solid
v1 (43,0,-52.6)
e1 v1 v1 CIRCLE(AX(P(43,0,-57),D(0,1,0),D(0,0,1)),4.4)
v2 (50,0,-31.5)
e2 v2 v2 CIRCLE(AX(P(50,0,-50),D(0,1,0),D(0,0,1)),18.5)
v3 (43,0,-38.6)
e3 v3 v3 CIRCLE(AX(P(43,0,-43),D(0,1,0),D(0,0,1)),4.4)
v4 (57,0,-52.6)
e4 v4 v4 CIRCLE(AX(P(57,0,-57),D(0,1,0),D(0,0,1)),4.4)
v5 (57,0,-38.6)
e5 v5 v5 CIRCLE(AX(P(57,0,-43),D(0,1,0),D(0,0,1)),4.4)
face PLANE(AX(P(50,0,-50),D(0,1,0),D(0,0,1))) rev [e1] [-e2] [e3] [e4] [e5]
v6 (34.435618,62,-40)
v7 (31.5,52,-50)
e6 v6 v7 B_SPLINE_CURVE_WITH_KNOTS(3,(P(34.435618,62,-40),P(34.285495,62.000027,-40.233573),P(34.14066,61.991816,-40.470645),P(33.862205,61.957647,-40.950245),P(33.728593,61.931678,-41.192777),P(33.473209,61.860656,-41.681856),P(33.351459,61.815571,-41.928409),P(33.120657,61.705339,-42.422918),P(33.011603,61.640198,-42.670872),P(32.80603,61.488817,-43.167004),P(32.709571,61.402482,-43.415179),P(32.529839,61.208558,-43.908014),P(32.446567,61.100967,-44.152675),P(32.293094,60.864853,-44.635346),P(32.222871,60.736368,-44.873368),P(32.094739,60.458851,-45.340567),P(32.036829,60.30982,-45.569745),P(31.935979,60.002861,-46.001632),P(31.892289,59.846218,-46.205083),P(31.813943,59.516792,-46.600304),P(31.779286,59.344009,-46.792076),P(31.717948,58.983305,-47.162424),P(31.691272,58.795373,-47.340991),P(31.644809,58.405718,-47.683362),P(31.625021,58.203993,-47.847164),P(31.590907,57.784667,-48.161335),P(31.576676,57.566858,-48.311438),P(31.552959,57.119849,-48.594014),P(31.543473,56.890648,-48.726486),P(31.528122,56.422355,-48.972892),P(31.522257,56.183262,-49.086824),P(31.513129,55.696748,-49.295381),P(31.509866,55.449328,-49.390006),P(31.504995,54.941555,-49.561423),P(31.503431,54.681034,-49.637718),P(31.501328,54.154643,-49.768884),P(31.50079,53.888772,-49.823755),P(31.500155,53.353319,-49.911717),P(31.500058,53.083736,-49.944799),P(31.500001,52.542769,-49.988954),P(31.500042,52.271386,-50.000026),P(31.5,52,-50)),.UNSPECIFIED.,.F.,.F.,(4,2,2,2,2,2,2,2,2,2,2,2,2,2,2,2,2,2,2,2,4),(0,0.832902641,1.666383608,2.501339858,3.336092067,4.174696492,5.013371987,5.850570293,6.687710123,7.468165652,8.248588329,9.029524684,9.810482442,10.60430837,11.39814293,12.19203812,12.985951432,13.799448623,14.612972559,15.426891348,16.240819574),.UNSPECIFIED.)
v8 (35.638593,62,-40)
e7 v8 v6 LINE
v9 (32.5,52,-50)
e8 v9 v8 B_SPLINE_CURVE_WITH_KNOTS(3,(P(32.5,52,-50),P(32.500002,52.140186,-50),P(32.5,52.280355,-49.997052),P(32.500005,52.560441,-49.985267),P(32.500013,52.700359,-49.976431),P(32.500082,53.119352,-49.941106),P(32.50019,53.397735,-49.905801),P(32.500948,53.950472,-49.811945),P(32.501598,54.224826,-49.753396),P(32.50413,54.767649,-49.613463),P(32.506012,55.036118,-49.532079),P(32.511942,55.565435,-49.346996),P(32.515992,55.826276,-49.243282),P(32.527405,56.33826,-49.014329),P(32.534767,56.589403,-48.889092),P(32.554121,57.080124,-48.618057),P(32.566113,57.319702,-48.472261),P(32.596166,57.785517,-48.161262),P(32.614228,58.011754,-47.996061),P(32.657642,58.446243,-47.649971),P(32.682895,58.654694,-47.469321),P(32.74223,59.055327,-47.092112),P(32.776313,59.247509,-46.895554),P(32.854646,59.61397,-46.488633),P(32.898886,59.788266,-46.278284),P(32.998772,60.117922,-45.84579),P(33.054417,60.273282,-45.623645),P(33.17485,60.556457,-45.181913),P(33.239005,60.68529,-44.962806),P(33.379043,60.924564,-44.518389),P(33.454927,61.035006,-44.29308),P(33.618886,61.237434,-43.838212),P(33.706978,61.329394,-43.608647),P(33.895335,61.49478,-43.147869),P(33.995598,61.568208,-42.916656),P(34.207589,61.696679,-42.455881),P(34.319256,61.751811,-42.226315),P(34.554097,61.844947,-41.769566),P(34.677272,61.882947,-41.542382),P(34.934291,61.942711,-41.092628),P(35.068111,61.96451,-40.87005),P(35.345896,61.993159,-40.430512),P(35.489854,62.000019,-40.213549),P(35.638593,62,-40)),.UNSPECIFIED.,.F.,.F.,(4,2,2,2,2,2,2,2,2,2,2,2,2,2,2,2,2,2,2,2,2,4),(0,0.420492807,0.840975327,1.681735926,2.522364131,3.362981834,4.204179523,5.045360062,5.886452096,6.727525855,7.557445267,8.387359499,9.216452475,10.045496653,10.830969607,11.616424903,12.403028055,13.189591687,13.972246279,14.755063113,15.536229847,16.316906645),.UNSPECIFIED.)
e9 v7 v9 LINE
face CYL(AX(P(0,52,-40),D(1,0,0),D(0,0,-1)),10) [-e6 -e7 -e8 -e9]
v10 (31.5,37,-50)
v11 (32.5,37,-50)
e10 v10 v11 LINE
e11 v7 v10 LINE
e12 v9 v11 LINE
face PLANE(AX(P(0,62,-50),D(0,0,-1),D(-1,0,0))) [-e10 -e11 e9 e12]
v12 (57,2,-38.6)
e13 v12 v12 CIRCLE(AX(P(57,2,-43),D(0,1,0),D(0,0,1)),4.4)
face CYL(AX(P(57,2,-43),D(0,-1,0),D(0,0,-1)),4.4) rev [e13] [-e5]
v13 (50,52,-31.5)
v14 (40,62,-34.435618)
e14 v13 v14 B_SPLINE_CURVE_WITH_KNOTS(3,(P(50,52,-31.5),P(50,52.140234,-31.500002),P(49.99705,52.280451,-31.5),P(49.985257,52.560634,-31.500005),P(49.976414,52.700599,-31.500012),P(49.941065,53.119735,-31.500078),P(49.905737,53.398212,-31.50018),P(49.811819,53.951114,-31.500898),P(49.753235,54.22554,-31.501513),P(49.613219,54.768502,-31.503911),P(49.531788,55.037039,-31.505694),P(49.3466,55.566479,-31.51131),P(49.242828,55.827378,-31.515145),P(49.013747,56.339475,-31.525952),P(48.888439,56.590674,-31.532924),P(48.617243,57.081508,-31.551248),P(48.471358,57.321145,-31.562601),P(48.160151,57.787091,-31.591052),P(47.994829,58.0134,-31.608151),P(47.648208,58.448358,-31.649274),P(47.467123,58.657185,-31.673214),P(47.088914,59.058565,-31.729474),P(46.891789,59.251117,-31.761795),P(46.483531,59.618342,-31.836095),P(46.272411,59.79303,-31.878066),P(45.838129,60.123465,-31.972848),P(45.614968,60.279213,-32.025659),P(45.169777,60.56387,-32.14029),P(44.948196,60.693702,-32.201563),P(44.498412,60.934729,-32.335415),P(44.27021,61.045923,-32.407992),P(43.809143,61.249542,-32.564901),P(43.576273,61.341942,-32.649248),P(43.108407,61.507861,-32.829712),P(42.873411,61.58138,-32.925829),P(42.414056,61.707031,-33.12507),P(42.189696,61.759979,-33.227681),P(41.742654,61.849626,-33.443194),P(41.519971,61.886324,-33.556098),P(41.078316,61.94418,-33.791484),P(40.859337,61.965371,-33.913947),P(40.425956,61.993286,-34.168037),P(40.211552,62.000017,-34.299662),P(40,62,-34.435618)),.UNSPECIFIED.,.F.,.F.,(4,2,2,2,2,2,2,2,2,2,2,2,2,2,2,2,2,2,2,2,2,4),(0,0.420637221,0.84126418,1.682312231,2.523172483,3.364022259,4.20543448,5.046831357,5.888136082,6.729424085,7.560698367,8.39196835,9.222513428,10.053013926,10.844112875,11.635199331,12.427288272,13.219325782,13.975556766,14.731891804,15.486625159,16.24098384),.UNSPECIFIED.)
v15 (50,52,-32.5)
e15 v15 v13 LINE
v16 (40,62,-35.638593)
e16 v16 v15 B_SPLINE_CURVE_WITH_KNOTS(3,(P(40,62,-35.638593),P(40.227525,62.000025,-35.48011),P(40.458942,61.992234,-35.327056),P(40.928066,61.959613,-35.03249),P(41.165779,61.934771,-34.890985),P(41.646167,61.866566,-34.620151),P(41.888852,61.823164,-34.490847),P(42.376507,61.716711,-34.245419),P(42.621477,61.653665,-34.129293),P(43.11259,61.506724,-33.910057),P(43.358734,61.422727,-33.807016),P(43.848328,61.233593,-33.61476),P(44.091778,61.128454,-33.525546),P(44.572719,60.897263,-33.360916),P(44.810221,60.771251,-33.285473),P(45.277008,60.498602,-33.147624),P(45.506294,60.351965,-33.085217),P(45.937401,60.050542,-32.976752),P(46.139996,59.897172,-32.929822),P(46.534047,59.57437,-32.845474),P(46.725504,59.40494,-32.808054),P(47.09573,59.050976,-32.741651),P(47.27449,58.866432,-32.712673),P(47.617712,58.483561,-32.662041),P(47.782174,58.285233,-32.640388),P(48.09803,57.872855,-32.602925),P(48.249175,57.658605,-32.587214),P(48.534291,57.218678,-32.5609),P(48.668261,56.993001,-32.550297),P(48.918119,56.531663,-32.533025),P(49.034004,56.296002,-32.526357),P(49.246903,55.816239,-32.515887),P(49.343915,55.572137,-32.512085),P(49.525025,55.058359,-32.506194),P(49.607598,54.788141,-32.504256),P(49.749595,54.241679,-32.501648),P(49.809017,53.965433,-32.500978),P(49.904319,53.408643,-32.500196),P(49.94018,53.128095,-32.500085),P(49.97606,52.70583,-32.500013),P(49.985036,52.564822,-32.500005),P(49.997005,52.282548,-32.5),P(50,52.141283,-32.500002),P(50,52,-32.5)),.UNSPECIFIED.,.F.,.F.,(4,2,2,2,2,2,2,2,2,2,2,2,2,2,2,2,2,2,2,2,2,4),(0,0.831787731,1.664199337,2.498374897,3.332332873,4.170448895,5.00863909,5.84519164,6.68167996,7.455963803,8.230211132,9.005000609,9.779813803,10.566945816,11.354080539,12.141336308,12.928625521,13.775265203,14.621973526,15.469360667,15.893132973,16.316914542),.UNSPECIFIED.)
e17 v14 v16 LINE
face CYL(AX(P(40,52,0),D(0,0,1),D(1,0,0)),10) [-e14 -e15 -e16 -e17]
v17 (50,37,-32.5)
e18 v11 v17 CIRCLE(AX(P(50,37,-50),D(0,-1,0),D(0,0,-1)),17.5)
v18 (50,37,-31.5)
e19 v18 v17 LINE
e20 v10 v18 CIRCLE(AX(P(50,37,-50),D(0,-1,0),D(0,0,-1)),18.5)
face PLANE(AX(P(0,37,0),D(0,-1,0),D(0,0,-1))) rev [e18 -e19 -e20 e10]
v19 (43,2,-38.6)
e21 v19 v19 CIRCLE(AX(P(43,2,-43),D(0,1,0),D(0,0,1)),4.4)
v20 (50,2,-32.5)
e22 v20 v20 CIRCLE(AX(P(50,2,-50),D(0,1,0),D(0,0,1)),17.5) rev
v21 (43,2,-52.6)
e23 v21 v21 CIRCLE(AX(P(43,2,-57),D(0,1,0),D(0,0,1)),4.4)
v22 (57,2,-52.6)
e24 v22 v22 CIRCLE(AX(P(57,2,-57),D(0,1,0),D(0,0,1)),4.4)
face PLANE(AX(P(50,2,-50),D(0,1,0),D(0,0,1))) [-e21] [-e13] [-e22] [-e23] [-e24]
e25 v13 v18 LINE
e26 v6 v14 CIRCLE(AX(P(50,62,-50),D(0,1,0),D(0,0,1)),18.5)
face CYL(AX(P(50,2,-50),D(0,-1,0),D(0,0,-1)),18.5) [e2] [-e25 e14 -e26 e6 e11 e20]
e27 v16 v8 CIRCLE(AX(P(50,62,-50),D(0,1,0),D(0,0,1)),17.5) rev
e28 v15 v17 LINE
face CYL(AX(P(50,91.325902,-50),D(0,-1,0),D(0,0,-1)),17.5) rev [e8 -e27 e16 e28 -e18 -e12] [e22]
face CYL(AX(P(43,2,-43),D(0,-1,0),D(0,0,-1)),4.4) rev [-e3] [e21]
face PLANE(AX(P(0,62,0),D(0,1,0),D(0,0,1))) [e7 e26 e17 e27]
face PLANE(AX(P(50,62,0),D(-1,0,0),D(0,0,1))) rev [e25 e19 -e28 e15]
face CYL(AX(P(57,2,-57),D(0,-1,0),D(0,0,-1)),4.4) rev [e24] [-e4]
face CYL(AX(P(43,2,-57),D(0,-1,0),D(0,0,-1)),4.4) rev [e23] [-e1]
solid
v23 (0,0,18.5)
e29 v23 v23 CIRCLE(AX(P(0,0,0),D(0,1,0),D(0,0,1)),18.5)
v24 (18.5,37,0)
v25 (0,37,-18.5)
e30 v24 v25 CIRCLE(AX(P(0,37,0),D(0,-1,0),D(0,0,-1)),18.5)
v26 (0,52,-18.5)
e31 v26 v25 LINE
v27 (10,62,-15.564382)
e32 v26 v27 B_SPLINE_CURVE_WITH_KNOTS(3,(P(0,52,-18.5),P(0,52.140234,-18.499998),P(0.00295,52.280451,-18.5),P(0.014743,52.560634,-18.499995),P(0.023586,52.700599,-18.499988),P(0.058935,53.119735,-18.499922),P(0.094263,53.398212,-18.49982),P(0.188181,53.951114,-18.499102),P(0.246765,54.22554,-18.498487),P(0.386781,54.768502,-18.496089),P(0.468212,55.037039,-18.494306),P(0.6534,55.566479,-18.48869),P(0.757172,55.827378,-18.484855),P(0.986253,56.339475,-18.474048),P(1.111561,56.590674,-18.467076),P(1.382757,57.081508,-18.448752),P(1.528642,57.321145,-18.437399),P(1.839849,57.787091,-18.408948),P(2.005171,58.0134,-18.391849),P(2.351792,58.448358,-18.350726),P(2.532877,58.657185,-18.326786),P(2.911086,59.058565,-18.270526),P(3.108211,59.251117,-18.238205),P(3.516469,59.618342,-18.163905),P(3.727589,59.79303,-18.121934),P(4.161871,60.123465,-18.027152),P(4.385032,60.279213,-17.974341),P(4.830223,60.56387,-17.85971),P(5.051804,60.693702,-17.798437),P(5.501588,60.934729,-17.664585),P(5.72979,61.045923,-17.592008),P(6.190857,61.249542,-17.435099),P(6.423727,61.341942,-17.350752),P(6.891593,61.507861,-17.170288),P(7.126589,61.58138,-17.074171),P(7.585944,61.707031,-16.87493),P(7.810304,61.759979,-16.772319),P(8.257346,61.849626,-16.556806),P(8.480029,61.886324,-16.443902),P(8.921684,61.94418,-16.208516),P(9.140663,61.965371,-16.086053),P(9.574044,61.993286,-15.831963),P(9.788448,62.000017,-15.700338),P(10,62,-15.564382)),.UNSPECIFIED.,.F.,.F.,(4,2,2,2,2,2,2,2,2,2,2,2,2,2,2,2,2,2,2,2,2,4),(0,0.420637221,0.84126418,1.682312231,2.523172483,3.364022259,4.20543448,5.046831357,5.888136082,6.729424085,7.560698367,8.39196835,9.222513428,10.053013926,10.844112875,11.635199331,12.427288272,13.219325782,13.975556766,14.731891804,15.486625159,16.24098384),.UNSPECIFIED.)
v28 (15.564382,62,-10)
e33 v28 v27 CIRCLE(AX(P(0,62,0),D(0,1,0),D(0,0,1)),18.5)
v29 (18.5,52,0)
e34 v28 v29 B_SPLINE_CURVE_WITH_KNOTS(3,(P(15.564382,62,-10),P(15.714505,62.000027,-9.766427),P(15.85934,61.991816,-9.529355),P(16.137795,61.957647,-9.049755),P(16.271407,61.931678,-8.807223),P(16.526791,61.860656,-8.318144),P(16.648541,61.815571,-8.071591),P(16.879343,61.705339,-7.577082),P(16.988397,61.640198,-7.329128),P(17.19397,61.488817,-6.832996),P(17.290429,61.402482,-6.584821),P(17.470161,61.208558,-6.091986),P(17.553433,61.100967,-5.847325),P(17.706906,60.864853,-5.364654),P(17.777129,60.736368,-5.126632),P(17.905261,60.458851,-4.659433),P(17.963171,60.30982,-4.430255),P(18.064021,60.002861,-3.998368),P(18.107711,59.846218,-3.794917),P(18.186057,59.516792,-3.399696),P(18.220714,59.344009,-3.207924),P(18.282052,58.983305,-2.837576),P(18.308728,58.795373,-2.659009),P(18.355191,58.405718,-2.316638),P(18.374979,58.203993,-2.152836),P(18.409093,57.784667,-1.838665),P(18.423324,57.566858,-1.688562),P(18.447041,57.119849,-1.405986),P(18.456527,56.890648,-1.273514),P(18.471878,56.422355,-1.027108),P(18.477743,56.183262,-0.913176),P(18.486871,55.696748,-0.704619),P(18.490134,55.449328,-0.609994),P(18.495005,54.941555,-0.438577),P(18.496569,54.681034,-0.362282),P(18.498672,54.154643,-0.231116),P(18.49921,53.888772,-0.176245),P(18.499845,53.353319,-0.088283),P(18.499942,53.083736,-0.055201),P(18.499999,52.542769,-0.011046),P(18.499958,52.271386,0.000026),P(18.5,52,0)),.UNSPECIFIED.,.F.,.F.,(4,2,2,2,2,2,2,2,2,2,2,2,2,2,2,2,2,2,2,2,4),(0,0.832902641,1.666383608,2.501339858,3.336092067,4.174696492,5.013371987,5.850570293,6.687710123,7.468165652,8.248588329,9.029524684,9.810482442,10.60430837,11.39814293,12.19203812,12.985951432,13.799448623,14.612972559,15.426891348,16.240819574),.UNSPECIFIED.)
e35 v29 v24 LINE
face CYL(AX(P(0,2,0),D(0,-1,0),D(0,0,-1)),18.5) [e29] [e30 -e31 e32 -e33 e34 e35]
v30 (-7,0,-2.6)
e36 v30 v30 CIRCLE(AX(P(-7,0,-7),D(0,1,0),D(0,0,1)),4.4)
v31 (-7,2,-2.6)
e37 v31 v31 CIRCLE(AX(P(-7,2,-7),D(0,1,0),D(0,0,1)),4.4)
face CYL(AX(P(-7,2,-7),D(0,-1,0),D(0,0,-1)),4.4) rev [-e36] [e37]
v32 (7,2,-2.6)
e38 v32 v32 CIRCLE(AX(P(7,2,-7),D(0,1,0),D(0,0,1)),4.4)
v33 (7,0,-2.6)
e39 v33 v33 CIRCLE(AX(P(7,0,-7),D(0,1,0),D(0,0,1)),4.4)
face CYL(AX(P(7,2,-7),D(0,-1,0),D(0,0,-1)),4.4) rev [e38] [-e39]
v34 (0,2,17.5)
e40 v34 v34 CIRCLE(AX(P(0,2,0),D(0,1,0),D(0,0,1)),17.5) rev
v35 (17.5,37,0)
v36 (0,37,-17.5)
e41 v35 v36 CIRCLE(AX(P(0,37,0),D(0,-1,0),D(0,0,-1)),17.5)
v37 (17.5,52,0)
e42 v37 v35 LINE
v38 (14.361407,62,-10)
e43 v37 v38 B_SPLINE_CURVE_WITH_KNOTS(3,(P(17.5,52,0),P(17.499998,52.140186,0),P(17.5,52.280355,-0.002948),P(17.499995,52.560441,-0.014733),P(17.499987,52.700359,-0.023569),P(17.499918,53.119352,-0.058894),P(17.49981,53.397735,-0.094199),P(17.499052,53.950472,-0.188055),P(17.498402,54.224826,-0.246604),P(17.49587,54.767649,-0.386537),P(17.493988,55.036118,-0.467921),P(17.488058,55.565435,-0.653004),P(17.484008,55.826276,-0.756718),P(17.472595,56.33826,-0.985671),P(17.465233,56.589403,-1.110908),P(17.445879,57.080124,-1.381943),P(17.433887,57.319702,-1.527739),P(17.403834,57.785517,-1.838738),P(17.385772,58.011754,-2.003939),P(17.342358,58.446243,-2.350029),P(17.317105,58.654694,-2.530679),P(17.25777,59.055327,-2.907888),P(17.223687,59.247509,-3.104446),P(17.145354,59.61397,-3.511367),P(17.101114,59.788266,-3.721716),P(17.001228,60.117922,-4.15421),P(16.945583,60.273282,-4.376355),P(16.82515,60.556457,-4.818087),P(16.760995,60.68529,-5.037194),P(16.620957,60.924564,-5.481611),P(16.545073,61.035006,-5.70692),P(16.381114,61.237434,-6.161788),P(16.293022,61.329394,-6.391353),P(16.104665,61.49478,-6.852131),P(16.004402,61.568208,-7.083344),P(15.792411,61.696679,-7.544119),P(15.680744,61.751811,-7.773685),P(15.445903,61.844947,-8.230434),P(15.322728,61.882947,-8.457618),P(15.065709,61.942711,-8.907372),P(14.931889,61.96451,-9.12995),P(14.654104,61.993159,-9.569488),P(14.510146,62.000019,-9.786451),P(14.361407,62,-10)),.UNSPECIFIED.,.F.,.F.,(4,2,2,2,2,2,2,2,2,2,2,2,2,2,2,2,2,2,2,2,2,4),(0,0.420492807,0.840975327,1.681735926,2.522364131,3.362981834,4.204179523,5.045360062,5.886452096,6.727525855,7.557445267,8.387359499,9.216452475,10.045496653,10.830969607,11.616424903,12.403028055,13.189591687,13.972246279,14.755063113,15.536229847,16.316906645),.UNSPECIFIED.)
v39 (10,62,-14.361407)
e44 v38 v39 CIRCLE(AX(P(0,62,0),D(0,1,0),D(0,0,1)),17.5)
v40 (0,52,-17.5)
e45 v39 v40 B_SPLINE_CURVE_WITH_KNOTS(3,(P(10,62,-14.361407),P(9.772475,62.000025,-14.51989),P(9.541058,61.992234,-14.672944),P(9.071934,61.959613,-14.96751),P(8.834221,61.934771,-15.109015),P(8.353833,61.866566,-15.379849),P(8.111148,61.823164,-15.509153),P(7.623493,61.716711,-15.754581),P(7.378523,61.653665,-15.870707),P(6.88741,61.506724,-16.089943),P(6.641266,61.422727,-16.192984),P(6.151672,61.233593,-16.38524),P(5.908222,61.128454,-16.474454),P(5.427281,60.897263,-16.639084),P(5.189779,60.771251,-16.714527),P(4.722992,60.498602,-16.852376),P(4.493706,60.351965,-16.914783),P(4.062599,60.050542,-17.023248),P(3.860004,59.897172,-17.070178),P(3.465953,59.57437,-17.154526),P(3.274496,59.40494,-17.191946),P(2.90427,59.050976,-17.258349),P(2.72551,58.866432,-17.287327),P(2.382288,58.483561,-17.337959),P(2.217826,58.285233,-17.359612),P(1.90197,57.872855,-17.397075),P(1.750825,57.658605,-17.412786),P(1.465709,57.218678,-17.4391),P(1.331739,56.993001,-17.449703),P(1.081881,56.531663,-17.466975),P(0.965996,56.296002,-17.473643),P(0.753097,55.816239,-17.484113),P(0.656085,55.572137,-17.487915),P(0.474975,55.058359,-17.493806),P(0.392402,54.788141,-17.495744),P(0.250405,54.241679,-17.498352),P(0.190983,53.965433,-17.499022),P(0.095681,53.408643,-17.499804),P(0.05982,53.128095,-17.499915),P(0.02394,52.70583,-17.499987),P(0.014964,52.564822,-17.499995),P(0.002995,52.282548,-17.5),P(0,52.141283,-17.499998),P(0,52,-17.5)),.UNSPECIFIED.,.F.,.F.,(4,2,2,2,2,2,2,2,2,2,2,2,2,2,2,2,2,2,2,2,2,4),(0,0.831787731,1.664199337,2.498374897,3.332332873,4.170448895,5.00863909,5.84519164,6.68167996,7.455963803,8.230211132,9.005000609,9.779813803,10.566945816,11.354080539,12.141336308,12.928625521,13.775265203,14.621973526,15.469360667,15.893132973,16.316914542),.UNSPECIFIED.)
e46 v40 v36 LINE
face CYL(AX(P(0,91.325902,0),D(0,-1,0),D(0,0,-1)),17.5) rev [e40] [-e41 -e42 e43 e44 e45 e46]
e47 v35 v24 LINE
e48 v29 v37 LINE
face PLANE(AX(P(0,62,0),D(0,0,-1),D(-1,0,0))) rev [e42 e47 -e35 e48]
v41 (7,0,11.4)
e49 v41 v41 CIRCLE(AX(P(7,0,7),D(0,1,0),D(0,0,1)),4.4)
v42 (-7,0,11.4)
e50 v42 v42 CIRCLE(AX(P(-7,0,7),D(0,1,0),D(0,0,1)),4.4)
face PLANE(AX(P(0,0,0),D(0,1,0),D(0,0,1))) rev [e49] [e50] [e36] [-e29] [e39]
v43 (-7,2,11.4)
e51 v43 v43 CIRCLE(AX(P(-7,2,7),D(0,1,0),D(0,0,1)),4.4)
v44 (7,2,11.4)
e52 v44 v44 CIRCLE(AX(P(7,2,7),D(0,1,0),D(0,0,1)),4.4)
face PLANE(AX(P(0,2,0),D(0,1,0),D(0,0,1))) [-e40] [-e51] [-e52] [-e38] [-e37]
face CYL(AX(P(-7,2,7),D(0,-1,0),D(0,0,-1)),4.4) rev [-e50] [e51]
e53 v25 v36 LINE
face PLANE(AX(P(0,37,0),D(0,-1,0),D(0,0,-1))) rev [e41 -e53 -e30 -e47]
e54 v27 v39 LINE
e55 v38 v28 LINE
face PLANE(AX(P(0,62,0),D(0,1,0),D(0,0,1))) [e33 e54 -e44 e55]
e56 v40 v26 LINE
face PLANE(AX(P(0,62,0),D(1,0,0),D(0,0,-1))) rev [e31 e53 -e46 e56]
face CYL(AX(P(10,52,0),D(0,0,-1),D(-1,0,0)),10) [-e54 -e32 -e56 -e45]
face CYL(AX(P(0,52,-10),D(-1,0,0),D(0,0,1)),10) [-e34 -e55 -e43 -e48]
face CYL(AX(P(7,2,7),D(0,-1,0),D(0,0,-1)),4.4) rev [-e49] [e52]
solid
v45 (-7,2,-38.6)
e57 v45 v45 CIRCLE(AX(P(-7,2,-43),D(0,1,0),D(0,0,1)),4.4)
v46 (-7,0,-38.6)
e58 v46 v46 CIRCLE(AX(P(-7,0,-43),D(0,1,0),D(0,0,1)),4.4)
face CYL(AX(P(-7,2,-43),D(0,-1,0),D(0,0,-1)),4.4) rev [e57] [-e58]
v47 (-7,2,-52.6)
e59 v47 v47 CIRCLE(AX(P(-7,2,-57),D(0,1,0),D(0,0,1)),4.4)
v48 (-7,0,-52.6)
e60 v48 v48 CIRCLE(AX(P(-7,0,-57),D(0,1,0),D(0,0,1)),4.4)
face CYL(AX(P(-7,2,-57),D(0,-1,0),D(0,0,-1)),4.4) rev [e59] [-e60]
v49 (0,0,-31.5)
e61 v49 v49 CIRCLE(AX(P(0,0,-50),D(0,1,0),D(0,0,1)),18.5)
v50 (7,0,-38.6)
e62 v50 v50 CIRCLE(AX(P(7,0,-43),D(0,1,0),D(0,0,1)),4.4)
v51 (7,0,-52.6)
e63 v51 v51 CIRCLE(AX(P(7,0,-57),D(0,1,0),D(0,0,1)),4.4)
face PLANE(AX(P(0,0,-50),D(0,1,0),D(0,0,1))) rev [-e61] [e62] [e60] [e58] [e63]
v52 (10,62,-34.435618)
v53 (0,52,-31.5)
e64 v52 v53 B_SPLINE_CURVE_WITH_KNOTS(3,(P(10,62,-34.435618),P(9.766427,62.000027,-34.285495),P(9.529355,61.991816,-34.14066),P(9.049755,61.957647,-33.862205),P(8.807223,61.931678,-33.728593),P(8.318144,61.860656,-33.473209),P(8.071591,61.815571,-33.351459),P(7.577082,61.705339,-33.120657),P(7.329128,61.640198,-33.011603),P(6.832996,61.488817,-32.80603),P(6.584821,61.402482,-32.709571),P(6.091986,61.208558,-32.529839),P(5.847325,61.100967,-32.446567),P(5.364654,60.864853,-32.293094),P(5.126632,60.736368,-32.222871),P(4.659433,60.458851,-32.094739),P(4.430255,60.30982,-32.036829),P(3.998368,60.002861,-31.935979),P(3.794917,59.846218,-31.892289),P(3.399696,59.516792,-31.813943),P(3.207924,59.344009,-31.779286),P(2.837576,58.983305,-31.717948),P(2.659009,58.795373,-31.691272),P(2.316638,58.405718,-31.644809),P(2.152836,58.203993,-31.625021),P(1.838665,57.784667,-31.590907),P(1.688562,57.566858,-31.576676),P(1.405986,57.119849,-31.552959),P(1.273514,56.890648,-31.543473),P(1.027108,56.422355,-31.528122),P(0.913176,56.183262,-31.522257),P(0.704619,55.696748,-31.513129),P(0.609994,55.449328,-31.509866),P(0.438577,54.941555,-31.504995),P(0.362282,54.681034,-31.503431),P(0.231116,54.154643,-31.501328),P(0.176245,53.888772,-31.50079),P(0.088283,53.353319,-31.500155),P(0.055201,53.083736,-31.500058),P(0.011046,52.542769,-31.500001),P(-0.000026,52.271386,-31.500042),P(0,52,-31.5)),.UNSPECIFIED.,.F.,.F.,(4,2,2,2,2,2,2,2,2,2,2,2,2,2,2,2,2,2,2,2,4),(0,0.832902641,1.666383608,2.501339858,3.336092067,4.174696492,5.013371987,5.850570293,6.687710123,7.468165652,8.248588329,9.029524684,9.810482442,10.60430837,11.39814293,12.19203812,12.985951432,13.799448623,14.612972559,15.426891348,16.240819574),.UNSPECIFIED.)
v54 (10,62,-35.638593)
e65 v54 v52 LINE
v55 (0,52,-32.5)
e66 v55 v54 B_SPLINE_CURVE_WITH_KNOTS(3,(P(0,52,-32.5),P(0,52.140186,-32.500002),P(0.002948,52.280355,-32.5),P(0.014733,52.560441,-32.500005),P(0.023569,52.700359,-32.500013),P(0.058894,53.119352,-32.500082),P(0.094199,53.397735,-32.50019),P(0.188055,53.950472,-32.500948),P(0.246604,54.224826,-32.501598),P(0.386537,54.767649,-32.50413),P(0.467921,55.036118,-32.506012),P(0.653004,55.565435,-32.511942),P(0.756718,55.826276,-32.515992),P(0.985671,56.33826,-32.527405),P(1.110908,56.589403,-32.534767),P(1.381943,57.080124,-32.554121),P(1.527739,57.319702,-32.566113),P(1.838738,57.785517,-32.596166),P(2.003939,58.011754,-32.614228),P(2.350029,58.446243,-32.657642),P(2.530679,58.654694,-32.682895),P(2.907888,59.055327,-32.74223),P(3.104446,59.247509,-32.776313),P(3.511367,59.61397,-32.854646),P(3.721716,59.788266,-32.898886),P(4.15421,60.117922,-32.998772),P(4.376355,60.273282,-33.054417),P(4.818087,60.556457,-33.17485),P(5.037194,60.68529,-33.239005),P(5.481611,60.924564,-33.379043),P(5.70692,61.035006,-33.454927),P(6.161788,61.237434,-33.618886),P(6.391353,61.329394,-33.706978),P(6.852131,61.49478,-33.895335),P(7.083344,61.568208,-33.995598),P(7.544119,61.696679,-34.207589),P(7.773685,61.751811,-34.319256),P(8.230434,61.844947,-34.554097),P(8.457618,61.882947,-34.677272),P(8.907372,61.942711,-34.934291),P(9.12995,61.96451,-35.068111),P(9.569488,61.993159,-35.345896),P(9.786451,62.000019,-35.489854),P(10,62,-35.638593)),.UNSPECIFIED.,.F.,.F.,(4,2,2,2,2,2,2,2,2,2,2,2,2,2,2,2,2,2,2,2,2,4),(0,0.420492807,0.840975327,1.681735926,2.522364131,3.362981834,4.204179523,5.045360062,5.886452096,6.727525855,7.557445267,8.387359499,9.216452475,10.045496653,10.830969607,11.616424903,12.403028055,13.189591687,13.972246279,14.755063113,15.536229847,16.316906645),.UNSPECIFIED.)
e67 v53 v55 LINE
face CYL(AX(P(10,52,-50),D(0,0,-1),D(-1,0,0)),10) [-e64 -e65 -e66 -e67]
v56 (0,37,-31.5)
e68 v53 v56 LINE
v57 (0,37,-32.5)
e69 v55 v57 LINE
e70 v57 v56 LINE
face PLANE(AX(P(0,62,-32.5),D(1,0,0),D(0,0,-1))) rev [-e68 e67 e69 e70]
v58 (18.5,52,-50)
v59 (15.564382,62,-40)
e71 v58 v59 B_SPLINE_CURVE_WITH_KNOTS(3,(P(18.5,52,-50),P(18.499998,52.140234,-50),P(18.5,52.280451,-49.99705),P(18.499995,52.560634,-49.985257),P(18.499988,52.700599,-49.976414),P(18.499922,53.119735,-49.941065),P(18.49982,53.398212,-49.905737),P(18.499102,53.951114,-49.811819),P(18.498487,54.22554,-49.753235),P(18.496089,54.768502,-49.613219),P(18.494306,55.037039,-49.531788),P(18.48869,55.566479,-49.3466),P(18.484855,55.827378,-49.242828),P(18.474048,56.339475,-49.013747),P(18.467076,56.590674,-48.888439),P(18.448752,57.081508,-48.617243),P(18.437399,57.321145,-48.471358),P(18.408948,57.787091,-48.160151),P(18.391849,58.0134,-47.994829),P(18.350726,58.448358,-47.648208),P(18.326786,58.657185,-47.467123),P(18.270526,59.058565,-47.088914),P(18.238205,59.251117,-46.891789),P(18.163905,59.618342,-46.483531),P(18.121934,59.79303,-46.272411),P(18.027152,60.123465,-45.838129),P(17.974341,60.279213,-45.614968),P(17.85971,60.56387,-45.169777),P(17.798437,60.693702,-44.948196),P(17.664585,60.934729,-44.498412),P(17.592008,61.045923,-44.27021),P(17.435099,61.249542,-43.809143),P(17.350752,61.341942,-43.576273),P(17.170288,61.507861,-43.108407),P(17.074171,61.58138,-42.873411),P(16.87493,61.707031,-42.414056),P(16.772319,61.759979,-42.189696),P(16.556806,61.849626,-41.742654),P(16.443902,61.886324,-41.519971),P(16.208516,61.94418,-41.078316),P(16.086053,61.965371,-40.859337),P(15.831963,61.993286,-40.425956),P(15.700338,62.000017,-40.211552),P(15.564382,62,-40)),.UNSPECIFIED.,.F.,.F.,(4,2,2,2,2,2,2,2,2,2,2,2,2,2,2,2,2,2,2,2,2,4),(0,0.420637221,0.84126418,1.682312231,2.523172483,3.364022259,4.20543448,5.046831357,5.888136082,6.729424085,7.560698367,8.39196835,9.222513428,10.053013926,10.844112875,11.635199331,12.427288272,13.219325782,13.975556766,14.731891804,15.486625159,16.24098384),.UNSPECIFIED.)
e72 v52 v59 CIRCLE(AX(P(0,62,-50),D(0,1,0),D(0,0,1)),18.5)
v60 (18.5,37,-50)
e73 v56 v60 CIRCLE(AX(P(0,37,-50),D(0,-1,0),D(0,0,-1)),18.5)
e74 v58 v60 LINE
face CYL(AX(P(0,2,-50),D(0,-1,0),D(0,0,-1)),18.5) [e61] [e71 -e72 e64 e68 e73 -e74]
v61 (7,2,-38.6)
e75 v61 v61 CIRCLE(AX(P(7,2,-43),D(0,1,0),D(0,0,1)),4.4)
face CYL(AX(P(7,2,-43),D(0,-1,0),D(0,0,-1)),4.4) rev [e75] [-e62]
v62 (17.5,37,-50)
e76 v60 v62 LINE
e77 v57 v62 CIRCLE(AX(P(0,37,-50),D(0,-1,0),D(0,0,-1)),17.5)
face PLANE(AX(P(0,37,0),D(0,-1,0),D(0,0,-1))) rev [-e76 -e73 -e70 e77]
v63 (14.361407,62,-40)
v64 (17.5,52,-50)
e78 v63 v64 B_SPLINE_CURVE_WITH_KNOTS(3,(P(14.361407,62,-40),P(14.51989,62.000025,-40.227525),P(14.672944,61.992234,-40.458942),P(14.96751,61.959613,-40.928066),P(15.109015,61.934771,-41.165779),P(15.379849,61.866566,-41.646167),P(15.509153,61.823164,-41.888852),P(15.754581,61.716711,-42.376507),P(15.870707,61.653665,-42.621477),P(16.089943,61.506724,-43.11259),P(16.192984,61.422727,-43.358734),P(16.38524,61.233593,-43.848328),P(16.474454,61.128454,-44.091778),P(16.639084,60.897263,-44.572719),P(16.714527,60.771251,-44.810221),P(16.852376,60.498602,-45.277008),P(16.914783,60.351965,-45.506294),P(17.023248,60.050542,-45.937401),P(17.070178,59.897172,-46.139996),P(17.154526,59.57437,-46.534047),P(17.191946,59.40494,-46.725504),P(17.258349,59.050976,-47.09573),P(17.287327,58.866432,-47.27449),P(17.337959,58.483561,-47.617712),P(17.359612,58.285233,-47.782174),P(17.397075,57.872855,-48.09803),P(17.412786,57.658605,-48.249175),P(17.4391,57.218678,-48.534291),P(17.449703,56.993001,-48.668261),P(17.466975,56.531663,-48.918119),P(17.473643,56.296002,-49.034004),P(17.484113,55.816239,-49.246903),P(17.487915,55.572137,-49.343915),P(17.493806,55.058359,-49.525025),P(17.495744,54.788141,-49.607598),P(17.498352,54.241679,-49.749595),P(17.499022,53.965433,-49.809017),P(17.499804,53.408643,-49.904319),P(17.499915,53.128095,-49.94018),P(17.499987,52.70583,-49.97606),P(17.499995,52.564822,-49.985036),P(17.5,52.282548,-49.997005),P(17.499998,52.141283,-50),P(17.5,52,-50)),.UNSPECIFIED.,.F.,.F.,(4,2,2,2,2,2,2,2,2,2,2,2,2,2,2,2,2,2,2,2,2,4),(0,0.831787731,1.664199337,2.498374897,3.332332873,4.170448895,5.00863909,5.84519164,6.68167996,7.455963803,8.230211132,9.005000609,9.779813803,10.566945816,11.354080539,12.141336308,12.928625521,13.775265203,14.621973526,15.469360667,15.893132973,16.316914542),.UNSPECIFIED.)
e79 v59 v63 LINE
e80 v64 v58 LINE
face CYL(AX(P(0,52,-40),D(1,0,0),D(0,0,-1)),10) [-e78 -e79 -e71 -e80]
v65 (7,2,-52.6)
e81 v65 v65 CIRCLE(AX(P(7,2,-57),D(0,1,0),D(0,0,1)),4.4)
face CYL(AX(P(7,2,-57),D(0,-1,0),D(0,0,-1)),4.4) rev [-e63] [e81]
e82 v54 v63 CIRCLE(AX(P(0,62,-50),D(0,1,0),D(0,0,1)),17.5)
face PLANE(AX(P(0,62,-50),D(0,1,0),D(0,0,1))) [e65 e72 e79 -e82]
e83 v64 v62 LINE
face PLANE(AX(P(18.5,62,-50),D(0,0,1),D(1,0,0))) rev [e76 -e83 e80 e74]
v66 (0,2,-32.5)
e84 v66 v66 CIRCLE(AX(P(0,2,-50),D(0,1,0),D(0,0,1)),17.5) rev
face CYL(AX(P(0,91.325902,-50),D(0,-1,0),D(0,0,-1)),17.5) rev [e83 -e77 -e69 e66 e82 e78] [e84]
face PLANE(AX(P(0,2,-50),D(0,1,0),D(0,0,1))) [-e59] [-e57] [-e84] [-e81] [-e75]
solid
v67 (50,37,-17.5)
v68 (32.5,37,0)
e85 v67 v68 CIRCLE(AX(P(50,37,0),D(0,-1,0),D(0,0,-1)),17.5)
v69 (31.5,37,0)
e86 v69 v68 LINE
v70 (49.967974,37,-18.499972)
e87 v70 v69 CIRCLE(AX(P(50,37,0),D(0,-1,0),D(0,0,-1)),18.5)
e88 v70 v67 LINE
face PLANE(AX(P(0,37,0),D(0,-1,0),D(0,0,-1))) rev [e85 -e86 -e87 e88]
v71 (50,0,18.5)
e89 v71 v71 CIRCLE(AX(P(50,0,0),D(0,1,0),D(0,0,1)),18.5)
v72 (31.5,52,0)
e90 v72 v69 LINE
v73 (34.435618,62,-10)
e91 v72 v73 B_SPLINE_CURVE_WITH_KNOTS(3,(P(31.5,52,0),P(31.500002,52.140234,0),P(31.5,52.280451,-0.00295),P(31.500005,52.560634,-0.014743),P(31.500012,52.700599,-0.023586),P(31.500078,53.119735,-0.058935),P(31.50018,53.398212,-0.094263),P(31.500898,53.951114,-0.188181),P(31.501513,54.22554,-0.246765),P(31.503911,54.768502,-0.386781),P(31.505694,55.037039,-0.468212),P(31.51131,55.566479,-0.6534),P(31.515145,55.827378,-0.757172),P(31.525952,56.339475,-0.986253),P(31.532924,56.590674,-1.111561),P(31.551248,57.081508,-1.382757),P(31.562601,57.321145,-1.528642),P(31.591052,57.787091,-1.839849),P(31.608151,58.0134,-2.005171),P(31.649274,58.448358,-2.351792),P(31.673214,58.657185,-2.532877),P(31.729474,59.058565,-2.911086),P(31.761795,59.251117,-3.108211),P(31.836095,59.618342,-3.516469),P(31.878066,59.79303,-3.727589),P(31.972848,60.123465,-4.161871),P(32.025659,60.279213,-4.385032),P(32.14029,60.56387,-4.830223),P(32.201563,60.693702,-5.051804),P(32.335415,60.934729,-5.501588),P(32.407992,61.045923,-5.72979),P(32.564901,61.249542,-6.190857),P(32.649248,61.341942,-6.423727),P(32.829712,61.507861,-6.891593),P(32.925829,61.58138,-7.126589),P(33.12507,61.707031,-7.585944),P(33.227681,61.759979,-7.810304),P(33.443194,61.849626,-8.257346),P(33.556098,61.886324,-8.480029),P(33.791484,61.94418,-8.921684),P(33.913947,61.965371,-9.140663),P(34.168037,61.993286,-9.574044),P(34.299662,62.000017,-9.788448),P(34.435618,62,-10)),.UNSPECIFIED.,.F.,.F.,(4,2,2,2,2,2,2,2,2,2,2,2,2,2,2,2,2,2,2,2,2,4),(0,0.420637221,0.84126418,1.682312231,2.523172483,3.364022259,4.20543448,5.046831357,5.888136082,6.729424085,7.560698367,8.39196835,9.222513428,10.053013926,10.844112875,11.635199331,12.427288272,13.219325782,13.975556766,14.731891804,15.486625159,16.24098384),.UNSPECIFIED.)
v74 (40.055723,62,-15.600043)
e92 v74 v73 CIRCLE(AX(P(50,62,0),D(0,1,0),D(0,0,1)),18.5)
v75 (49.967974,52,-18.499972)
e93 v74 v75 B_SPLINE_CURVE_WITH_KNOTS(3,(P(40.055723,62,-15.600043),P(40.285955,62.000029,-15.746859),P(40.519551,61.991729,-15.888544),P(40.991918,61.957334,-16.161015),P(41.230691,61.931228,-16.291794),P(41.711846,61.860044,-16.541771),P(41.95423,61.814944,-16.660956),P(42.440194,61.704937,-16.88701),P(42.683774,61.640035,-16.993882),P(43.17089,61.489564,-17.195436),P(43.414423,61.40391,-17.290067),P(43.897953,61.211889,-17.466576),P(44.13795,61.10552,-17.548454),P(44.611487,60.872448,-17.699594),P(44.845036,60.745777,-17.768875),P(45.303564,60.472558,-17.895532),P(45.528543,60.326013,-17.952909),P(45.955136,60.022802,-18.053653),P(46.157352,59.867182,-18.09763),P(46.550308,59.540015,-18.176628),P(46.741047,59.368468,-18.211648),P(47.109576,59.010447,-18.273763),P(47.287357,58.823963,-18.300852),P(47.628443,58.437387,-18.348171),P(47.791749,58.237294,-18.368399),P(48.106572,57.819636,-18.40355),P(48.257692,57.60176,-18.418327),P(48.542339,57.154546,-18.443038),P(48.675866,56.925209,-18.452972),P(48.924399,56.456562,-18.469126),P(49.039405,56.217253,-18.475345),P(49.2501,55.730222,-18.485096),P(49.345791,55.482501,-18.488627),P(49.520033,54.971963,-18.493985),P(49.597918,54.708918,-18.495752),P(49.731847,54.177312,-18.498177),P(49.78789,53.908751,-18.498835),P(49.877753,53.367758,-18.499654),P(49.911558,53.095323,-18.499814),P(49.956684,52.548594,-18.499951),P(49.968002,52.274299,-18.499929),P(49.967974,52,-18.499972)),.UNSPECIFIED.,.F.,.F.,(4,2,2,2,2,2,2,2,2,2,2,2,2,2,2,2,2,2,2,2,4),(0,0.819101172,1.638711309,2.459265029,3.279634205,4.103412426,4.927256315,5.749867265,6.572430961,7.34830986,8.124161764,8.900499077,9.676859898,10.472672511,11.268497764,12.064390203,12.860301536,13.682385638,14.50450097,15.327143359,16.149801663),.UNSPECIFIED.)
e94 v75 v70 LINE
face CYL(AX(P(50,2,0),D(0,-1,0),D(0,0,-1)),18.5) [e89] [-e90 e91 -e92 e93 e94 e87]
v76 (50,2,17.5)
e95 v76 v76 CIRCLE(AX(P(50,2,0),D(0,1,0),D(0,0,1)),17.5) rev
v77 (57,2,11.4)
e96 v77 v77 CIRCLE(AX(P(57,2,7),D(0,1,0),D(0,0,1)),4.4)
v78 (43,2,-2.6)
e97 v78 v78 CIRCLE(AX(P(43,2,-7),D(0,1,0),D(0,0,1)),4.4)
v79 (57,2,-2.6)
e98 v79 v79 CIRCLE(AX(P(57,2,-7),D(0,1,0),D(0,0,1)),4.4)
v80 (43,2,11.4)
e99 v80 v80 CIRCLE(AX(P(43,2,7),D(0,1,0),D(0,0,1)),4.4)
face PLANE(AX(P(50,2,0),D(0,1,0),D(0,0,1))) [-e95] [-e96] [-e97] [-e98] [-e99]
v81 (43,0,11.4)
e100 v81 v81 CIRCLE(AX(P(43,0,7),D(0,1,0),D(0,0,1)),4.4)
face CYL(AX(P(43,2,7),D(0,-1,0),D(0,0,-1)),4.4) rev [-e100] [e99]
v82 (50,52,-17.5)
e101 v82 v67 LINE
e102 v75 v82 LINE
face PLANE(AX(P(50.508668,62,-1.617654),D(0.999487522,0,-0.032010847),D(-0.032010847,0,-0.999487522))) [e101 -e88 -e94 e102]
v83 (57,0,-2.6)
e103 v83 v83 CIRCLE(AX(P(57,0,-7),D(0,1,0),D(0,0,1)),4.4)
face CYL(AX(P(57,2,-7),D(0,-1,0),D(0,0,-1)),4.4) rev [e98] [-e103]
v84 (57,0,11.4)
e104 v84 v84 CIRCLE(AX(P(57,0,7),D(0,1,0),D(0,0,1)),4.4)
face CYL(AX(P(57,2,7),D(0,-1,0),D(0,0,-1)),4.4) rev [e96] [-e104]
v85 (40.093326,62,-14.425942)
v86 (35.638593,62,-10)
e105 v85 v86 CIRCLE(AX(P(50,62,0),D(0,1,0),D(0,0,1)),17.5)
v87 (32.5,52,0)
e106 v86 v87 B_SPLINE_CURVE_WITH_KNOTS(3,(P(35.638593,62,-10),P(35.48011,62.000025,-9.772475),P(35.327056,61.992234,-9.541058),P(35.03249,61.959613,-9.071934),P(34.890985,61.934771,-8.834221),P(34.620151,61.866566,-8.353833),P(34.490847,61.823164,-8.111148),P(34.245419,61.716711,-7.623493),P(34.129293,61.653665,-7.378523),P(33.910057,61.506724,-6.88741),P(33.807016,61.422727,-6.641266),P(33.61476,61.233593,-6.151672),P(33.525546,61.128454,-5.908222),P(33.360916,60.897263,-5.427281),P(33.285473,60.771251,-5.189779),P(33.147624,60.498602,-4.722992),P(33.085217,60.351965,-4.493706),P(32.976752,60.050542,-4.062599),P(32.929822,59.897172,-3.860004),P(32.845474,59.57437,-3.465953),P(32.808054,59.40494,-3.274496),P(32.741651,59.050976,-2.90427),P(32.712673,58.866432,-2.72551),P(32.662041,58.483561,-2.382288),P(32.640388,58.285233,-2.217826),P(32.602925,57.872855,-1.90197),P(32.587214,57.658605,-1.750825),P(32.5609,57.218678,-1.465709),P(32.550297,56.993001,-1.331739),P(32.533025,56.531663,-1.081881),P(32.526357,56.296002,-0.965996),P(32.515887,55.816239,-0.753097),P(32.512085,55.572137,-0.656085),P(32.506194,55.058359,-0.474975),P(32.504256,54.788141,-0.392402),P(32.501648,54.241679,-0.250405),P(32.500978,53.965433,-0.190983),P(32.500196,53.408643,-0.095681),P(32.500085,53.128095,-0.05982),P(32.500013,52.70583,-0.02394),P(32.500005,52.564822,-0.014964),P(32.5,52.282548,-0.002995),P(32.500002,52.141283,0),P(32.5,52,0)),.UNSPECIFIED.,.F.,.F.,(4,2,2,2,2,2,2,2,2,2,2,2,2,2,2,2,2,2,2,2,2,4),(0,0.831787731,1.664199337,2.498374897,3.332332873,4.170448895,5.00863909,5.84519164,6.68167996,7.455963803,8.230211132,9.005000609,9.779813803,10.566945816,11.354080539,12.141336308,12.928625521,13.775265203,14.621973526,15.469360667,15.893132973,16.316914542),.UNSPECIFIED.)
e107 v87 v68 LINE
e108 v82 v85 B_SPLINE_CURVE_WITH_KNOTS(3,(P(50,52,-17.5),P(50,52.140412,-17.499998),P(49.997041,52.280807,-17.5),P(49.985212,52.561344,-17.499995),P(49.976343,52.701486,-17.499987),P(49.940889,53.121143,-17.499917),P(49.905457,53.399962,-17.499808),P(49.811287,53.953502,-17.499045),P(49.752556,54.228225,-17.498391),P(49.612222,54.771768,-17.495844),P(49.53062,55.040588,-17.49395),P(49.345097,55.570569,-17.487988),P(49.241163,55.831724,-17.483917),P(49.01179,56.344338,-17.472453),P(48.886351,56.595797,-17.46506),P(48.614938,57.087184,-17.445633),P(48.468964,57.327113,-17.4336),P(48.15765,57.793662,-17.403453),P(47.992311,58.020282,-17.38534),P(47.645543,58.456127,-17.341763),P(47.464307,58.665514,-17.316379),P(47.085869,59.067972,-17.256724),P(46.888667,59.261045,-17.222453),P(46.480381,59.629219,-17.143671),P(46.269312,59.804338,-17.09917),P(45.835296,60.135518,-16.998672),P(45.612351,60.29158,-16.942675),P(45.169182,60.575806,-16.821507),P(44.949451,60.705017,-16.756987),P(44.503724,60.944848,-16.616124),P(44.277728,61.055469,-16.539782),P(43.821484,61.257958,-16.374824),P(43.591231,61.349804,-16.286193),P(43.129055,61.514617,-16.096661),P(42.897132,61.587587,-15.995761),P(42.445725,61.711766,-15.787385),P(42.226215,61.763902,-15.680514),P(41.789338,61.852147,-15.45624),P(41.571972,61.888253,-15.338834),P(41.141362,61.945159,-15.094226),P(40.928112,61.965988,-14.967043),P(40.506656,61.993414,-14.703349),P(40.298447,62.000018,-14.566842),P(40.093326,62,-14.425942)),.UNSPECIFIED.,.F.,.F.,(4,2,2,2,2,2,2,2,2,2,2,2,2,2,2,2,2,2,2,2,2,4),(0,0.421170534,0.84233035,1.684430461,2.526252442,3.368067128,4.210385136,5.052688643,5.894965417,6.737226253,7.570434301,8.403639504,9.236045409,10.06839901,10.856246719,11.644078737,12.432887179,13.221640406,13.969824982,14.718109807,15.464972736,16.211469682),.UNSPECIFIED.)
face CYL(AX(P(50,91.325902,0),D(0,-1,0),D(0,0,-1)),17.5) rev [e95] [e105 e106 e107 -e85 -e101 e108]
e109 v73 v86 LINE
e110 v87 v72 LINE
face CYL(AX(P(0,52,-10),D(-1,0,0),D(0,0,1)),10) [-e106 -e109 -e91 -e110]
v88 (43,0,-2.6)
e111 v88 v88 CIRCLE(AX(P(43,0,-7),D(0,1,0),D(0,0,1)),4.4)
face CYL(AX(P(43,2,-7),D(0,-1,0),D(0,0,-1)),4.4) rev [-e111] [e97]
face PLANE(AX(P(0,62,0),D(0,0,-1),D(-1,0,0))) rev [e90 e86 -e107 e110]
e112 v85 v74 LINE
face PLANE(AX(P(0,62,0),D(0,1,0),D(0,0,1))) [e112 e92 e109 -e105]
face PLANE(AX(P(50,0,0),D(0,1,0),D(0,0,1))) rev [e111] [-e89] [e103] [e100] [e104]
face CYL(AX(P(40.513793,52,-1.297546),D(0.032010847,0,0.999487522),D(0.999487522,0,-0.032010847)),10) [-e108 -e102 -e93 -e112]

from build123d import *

# Parameters (mm, degrees)
SKETCH1_R             = 18.5
SKETCH1_R_2           = 4.4
BOSS_EXTRUDE1_DEPTH   = 2
BOSS_EXTRUDE1_2_DEPTH = 2
BOSS_EXTRUDE1_3_DEPTH = 2
BOSS_EXTRUDE1_4_DEPTH = 2
SKETCH2_R             = 18.5
SKETCH2_R_2           = 17.5
BOSS_EXTRUDE2_DEPTH   = 35
BOSS_EXTRUDE3_DEPTH   = 25
FILLET1_R             = 10
FILLET2_R             = 10
FILLET3_R             = 10
FILLET4_R             = 10


with BuildPart() as part:
    # Sketch1 → Boss-Extrude1 (new body)
    with BuildSketch(Plane(origin=(0, 0, 0), x_dir=(1, 0, 0), z_dir=(0, 1, 0))):
        with Locations(Location((0, 0, 0), (0, 0, 270))):
            Circle(SKETCH1_R)
        with Locations(Location((-7, -7, 0), (0, 0, 270))):
            Circle(SKETCH1_R_2, mode=Mode.SUBTRACT)
        with Locations(Location((-7, 7, 0), (0, 0, 270))):
            Circle(SKETCH1_R_2, mode=Mode.SUBTRACT)
        with Locations(Location((7, 7, 0), (0, 0, 270))):
            Circle(SKETCH1_R_2, mode=Mode.SUBTRACT)
        with Locations(Location((7, -7, 0), (0, 0, 270))):
            Circle(SKETCH1_R_2, mode=Mode.SUBTRACT)
    extrude(amount=BOSS_EXTRUDE1_DEPTH)



with BuildPart() as body_2:
    # Sketch1 → Boss-Extrude1 2 (new body)
    with BuildSketch(Plane(origin=(0, 0, 0), x_dir=(1, 0, 0), z_dir=(0, 1, 0))):
        with Locations(Location((0, 50, 0), (0, 0, 270))):
            Circle(SKETCH1_R)
        with Locations(Location((-7, 43, 0), (0, 0, 270))):
            Circle(SKETCH1_R_2, mode=Mode.SUBTRACT)
        with Locations(Location((-7, 57, 0), (0, 0, 270))):
            Circle(SKETCH1_R_2, mode=Mode.SUBTRACT)
        with Locations(Location((7, 43, 0), (0, 0, 270))):
            Circle(SKETCH1_R_2, mode=Mode.SUBTRACT)
        with Locations(Location((7, 57, 0), (0, 0, 270))):
            Circle(SKETCH1_R_2, mode=Mode.SUBTRACT)
    extrude(amount=BOSS_EXTRUDE1_2_DEPTH)


with BuildPart() as body_3:
    # Sketch1 → Boss-Extrude1 3 (new body)
    with BuildSketch(Plane(origin=(0, 0, 0), x_dir=(1, 0, 0), z_dir=(0, 1, 0))):
        with Locations(Location((50, 0, 0), (0, 0, 270))):
            Circle(SKETCH1_R)
        with Locations(Location((43, -7, 0), (0, 0, 270))):
            Circle(SKETCH1_R_2, mode=Mode.SUBTRACT)
        with Locations(Location((43, 7, 0), (0, 0, 270))):
            Circle(SKETCH1_R_2, mode=Mode.SUBTRACT)
        with Locations(Location((57, -7, 0), (0, 0, 270))):
            Circle(SKETCH1_R_2, mode=Mode.SUBTRACT)
        with Locations(Location((57, 7, 0), (0, 0, 270))):
            Circle(SKETCH1_R_2, mode=Mode.SUBTRACT)
    extrude(amount=BOSS_EXTRUDE1_3_DEPTH)


with BuildPart() as body_4:
    # Sketch1 → Boss-Extrude1 4 (new body)
    with BuildSketch(Plane(origin=(0, 0, 0), x_dir=(1, 0, 0), z_dir=(0, 1, 0))):
        with Locations(Location((50, 50, 0), (0, 0, 270))):
            Circle(SKETCH1_R)
        with Locations(Location((43, 43, 0), (0, 0, 270))):
            Circle(SKETCH1_R_2, mode=Mode.SUBTRACT)
        with Locations(Location((57, 43, 0), (0, 0, 270))):
            Circle(SKETCH1_R_2, mode=Mode.SUBTRACT)
        with Locations(Location((43, 57, 0), (0, 0, 270))):
            Circle(SKETCH1_R_2, mode=Mode.SUBTRACT)
        with Locations(Location((57, 57, 0), (0, 0, 270))):
            Circle(SKETCH1_R_2, mode=Mode.SUBTRACT)
    extrude(amount=BOSS_EXTRUDE1_4_DEPTH)


with BuildPart() as part_1:
    add(part.part)

    add(body_2.part)  # Boss-Extrude2 merges body 2

    add(body_3.part)  # Boss-Extrude2 merges body 3

    add(body_4.part)  # Boss-Extrude2 merges body 4
    # Sketch2 → Boss-Extrude2 (add)
    # profile 1 of 4: a face of its own
    with BuildSketch(Plane(origin=(0, 2, 0), x_dir=(1, 0, 0), z_dir=(0, 1, 0))):
        with Locations(Location((0, 0, 0), (0, 0, 90))):
            Circle(SKETCH2_R)
        with Locations(Location((0, 0, 0), (0, 0, 90))):
            Circle(SKETCH2_R_2, mode=Mode.SUBTRACT)
    # profile 2 of 4: a face of its own
    with BuildSketch(Plane(origin=(0, 2, 0), x_dir=(1, 0, 0), z_dir=(0, 1, 0))):
        with Locations(Location((50, 0, 0), (0, 0, 90))):
            Circle(SKETCH2_R)
        with Locations(Location((50, 0, 0), (0, 0, 90))):
            Circle(SKETCH2_R_2, mode=Mode.SUBTRACT)
    # profile 3 of 4: a face of its own
    with BuildSketch(Plane(origin=(0, 2, 0), x_dir=(1, 0, 0), z_dir=(0, 1, 0))):
        with Locations(Location((50, 50, 0), (0, 0, 90))):
            Circle(SKETCH2_R)
        with Locations(Location((50, 50, 0), (0, 0, 90))):
            Circle(SKETCH2_R_2, mode=Mode.SUBTRACT)
    # profile 4 of 4: a face of its own
    with BuildSketch(Plane(origin=(0, 2, 0), x_dir=(1, 0, 0), z_dir=(0, 1, 0))):
        with Locations(Location((0, 50, 0), (0, 0, 90))):
            Circle(SKETCH2_R)
        with Locations(Location((0, 50, 0), (0, 0, 90))):
            Circle(SKETCH2_R_2, mode=Mode.SUBTRACT)
    extrude(amount=BOSS_EXTRUDE2_DEPTH)

    # Sketch3 → Boss-Extrude3 (add)
    with BuildSketch(Plane(origin=(0, 37, 0), x_dir=(1, 0, 0), z_dir=(0, 1, 0))):
        with BuildLine():
            ThreePointArc((31.5, 50), (36.918524548, 36.918524548), (50, 31.5))
            Line((50, 31.5), (50, 32.5))
            ThreePointArc((50, 32.5), (37.625631329, 37.625631329), (32.5, 50))
            Line((32.5, 50), (31.5, 50))
        make_face()
        with BuildLine():
            ThreePointArc((0, 31.5), (13.081475452, 36.918524548), (18.5, 50))
            Line((18.5, 50), (17.5, 50))
            ThreePointArc((17.5, 50), (12.374368671, 37.625631329), (0, 32.5))
            Line((0, 32.5), (0, 31.5))
        make_face()
        with BuildLine():
            ThreePointArc((18.5, 0), (13.081475452, 13.081475452), (0, 18.5))
            Line((0, 18.5), (0, 17.5))
            ThreePointArc((0, 17.5), (12.374368671, 12.374368671), (17.5, 0))
            Line((17.5, 0), (18.5, 0))
        make_face()
        with BuildLine():
            Line((50, 17.5), (49.967973628, 18.499972279))
            ThreePointArc((49.967973628, 18.499972279), (36.907206412, 13.070147515), (31.5, 0))
            Line((31.5, 0), (32.5, 0))
            ThreePointArc((32.5, 0), (37.625631329, 12.374368671), (50, 17.5))
        make_face()
    extrude(amount=BOSS_EXTRUDE3_DEPTH)

    # Fillet1
    # the kernel refuses this fillet: 10 mm, written as the material it takes off along each edge
    with BuildSketch(Plane(origin=(50.800271171, 62, 7.487188038), x_dir=(0, -1, 0), z_dir=(-0.032010846851567645, 0, -0.9994875215248291))) as fillet1_piece_1_section:
        with BuildLine():
            CenterArc((FILLET1_R, FILLET1_R), FILLET1_R, 180, 90)
            Line((0, FILLET1_R), (-FILLET1_R * 0.02, FILLET1_R))
            Line((-FILLET1_R * 0.02, FILLET1_R), (-FILLET1_R * 0.02, -FILLET1_R * 0.02))
            Line((-FILLET1_R * 0.02, -FILLET1_R * 0.02), (FILLET1_R, -FILLET1_R * 0.02))
            Line((FILLET1_R, -FILLET1_R * 0.02), (FILLET1_R, 0))
        make_face()
    fillet1_piece_1 = extrude(amount=51.000485006, mode=Mode.PRIVATE)
    fillet1_piece_1 = fillet1_piece_1 & Plane(origin=(50, 59.758154055, 0), x_dir=(-0.001731155259173072, 0, -0.9999985015496117), z_dir=(0, -1, 0)) * Cylinder(18.5, 143, mode=Mode.PRIVATE)
    fillet1_piece_1 = fillet1_piece_1 - Plane(origin=(50, 59.758154055, 0), x_dir=(-1, 0, 0), z_dir=(0, -1, 0)) * Cylinder(17.5, 143, mode=Mode.PRIVATE)
    add(fillet1_piece_1, mode=Mode.SUBTRACT)
    with BuildSketch(Plane(origin=(6.5, 62, 0), x_dir=(0, -1, 0), z_dir=(1, 0, 0))) as fillet1_piece_2_section:
        with BuildLine():
            CenterArc((FILLET1_R, FILLET1_R), FILLET1_R, 180, 90)
            Line((0, FILLET1_R), (-FILLET1_R * 0.02, FILLET1_R))
            Line((-FILLET1_R * 0.02, FILLET1_R), (-FILLET1_R * 0.02, -FILLET1_R * 0.02))
            Line((-FILLET1_R * 0.02, -FILLET1_R * 0.02), (FILLET1_R, -FILLET1_R * 0.02))
            Line((FILLET1_R, -FILLET1_R * 0.02), (FILLET1_R, 0))
        make_face()
    fillet1_piece_2 = extrude(amount=51, mode=Mode.PRIVATE)
    fillet1_piece_2 = fillet1_piece_2 & Plane(origin=(50, 59.763635788, 0), x_dir=(-0.001731155259173072, 0, -0.9999985015496117), z_dir=(0, -1, 0)) * Cylinder(18.5, 142, mode=Mode.PRIVATE)
    fillet1_piece_2 = fillet1_piece_2 - Plane(origin=(50, 59.763635788, 0), x_dir=(-1, 0, 0), z_dir=(0, -1, 0)) * Cylinder(17.5, 142, mode=Mode.PRIVATE)
    add(fillet1_piece_2, mode=Mode.SUBTRACT)

    # Fillet2
    # the kernel refuses this fillet: 10 mm, written as the material it takes off along each edge
    with BuildSketch(Plane(origin=(57.5, 62, -50), x_dir=(0, -1, 0), z_dir=(-1, 0, 0))) as fillet2_piece_1_section:
        with BuildLine():
            CenterArc((FILLET2_R, FILLET2_R), FILLET2_R, 180, 90)
            Line((0, FILLET2_R), (-FILLET2_R * 0.02, FILLET2_R))
            Line((-FILLET2_R * 0.02, FILLET2_R), (-FILLET2_R * 0.02, -FILLET2_R * 0.02))
            Line((-FILLET2_R * 0.02, -FILLET2_R * 0.02), (FILLET2_R, -FILLET2_R * 0.02))
            Line((FILLET2_R, -FILLET2_R * 0.02), (FILLET2_R, 0))
        make_face()
    fillet2_piece_1 = extrude(amount=51, mode=Mode.PRIVATE)
    fillet2_piece_1 = fillet2_piece_1 & Plane(origin=(50, 59.763632396, -50), x_dir=(-1, 0, 0), z_dir=(0, -1, 0)) * Cylinder(18.5, 142, mode=Mode.PRIVATE)
    fillet2_piece_1 = fillet2_piece_1 - Plane(origin=(50, 59.763632396, -50), x_dir=(0, 0, 1), z_dir=(0, -1, 0)) * Cylinder(17.5, 142, mode=Mode.PRIVATE)
    add(fillet2_piece_1, mode=Mode.SUBTRACT)
    with BuildSketch(Plane(origin=(50, 62, -6.5), x_dir=(0, -1, 0), z_dir=(0, 0, -1))) as fillet2_piece_2_section:
        with BuildLine():
            CenterArc((FILLET2_R, FILLET2_R), FILLET2_R, 180, 90)
            Line((0, FILLET2_R), (-FILLET2_R * 0.02, FILLET2_R))
            Line((-FILLET2_R * 0.02, FILLET2_R), (-FILLET2_R * 0.02, -FILLET2_R * 0.02))
            Line((-FILLET2_R * 0.02, -FILLET2_R * 0.02), (FILLET2_R, -FILLET2_R * 0.02))
            Line((FILLET2_R, -FILLET2_R * 0.02), (FILLET2_R, 0))
        make_face()
    fillet2_piece_2 = extrude(amount=51, mode=Mode.PRIVATE)
    fillet2_piece_2 = fillet2_piece_2 & Plane(origin=(50, 59.763635785, -50), x_dir=(-1, 0, 0), z_dir=(0, -1, 0)) * Cylinder(18.5, 142, mode=Mode.PRIVATE)
    fillet2_piece_2 = fillet2_piece_2 - Plane(origin=(50, 59.763635785, -50), x_dir=(0, 0, 1), z_dir=(0, -1, 0)) * Cylinder(17.5, 142, mode=Mode.PRIVATE)
    add(fillet2_piece_2, mode=Mode.SUBTRACT)

    # Fillet3
    # the kernel refuses this fillet: 10 mm, written as the material it takes off along each edge
    with BuildSketch(Plane(origin=(0, 62, -57.5), x_dir=(0, -1, 0), z_dir=(0, 0, 1))) as fillet3_piece_1_section:
        with BuildLine():
            CenterArc((FILLET3_R, FILLET3_R), FILLET3_R, 180, 90)
            Line((0, FILLET3_R), (-FILLET3_R * 0.02, FILLET3_R))
            Line((-FILLET3_R * 0.02, FILLET3_R), (-FILLET3_R * 0.02, -FILLET3_R * 0.02))
            Line((-FILLET3_R * 0.02, -FILLET3_R * 0.02), (FILLET3_R, -FILLET3_R * 0.02))
            Line((FILLET3_R, -FILLET3_R * 0.02), (FILLET3_R, 0))
        make_face()
    fillet3_piece_1 = extrude(amount=51, mode=Mode.PRIVATE)
    fillet3_piece_1 = fillet3_piece_1 & Plane(origin=(0, 59.763632401, -50), x_dir=(0, 0, 1), z_dir=(0, -1, 0)) * Cylinder(18.5, 142, mode=Mode.PRIVATE)
    fillet3_piece_1 = fillet3_piece_1 - Plane(origin=(0, 59.763632401, -50), x_dir=(1, 0, 0), z_dir=(0, -1, 0)) * Cylinder(17.5, 142, mode=Mode.PRIVATE)
    add(fillet3_piece_1, mode=Mode.SUBTRACT)
    with BuildSketch(Plane(origin=(43.5, 62, -50), x_dir=(0, -1, 0), z_dir=(-1, 0, 0))) as fillet3_piece_2_section:
        with BuildLine():
            CenterArc((FILLET3_R, FILLET3_R), FILLET3_R, 180, 90)
            Line((0, FILLET3_R), (-FILLET3_R * 0.02, FILLET3_R))
            Line((-FILLET3_R * 0.02, FILLET3_R), (-FILLET3_R * 0.02, -FILLET3_R * 0.02))
            Line((-FILLET3_R * 0.02, -FILLET3_R * 0.02), (FILLET3_R, -FILLET3_R * 0.02))
            Line((FILLET3_R, -FILLET3_R * 0.02), (FILLET3_R, 0))
        make_face()
    fillet3_piece_2 = extrude(amount=51, mode=Mode.PRIVATE)
    fillet3_piece_2 = fillet3_piece_2 & Plane(origin=(0, 59.763635788, -50), x_dir=(0, 0, 1), z_dir=(0, -1, 0)) * Cylinder(18.5, 142, mode=Mode.PRIVATE)
    fillet3_piece_2 = fillet3_piece_2 - Plane(origin=(0, 59.763635788, -50), x_dir=(1, 0, 0), z_dir=(0, -1, 0)) * Cylinder(17.5, 142, mode=Mode.PRIVATE)
    add(fillet3_piece_2, mode=Mode.SUBTRACT)

    # Fillet4
    # the kernel refuses this fillet: 10 mm, written as the material it takes off along each edge
    with BuildSketch(Plane(origin=(-7.5, 62, 0), x_dir=(0, -1, 0), z_dir=(1, 0, 0)), Plane(origin=(0, 62, -43.5), x_dir=(0, -1, 0), z_dir=(0, 0, 1))) as fillet4_piece_1:
        with BuildLine():
            CenterArc((FILLET4_R, FILLET4_R), FILLET4_R, 180, 90)
            Line((0, FILLET4_R), (0, 0))
            Line((0, 0), (FILLET4_R, 0))
        make_face()
    extrude(amount=51, mode=Mode.SUBTRACT)


solid = part_1.part
